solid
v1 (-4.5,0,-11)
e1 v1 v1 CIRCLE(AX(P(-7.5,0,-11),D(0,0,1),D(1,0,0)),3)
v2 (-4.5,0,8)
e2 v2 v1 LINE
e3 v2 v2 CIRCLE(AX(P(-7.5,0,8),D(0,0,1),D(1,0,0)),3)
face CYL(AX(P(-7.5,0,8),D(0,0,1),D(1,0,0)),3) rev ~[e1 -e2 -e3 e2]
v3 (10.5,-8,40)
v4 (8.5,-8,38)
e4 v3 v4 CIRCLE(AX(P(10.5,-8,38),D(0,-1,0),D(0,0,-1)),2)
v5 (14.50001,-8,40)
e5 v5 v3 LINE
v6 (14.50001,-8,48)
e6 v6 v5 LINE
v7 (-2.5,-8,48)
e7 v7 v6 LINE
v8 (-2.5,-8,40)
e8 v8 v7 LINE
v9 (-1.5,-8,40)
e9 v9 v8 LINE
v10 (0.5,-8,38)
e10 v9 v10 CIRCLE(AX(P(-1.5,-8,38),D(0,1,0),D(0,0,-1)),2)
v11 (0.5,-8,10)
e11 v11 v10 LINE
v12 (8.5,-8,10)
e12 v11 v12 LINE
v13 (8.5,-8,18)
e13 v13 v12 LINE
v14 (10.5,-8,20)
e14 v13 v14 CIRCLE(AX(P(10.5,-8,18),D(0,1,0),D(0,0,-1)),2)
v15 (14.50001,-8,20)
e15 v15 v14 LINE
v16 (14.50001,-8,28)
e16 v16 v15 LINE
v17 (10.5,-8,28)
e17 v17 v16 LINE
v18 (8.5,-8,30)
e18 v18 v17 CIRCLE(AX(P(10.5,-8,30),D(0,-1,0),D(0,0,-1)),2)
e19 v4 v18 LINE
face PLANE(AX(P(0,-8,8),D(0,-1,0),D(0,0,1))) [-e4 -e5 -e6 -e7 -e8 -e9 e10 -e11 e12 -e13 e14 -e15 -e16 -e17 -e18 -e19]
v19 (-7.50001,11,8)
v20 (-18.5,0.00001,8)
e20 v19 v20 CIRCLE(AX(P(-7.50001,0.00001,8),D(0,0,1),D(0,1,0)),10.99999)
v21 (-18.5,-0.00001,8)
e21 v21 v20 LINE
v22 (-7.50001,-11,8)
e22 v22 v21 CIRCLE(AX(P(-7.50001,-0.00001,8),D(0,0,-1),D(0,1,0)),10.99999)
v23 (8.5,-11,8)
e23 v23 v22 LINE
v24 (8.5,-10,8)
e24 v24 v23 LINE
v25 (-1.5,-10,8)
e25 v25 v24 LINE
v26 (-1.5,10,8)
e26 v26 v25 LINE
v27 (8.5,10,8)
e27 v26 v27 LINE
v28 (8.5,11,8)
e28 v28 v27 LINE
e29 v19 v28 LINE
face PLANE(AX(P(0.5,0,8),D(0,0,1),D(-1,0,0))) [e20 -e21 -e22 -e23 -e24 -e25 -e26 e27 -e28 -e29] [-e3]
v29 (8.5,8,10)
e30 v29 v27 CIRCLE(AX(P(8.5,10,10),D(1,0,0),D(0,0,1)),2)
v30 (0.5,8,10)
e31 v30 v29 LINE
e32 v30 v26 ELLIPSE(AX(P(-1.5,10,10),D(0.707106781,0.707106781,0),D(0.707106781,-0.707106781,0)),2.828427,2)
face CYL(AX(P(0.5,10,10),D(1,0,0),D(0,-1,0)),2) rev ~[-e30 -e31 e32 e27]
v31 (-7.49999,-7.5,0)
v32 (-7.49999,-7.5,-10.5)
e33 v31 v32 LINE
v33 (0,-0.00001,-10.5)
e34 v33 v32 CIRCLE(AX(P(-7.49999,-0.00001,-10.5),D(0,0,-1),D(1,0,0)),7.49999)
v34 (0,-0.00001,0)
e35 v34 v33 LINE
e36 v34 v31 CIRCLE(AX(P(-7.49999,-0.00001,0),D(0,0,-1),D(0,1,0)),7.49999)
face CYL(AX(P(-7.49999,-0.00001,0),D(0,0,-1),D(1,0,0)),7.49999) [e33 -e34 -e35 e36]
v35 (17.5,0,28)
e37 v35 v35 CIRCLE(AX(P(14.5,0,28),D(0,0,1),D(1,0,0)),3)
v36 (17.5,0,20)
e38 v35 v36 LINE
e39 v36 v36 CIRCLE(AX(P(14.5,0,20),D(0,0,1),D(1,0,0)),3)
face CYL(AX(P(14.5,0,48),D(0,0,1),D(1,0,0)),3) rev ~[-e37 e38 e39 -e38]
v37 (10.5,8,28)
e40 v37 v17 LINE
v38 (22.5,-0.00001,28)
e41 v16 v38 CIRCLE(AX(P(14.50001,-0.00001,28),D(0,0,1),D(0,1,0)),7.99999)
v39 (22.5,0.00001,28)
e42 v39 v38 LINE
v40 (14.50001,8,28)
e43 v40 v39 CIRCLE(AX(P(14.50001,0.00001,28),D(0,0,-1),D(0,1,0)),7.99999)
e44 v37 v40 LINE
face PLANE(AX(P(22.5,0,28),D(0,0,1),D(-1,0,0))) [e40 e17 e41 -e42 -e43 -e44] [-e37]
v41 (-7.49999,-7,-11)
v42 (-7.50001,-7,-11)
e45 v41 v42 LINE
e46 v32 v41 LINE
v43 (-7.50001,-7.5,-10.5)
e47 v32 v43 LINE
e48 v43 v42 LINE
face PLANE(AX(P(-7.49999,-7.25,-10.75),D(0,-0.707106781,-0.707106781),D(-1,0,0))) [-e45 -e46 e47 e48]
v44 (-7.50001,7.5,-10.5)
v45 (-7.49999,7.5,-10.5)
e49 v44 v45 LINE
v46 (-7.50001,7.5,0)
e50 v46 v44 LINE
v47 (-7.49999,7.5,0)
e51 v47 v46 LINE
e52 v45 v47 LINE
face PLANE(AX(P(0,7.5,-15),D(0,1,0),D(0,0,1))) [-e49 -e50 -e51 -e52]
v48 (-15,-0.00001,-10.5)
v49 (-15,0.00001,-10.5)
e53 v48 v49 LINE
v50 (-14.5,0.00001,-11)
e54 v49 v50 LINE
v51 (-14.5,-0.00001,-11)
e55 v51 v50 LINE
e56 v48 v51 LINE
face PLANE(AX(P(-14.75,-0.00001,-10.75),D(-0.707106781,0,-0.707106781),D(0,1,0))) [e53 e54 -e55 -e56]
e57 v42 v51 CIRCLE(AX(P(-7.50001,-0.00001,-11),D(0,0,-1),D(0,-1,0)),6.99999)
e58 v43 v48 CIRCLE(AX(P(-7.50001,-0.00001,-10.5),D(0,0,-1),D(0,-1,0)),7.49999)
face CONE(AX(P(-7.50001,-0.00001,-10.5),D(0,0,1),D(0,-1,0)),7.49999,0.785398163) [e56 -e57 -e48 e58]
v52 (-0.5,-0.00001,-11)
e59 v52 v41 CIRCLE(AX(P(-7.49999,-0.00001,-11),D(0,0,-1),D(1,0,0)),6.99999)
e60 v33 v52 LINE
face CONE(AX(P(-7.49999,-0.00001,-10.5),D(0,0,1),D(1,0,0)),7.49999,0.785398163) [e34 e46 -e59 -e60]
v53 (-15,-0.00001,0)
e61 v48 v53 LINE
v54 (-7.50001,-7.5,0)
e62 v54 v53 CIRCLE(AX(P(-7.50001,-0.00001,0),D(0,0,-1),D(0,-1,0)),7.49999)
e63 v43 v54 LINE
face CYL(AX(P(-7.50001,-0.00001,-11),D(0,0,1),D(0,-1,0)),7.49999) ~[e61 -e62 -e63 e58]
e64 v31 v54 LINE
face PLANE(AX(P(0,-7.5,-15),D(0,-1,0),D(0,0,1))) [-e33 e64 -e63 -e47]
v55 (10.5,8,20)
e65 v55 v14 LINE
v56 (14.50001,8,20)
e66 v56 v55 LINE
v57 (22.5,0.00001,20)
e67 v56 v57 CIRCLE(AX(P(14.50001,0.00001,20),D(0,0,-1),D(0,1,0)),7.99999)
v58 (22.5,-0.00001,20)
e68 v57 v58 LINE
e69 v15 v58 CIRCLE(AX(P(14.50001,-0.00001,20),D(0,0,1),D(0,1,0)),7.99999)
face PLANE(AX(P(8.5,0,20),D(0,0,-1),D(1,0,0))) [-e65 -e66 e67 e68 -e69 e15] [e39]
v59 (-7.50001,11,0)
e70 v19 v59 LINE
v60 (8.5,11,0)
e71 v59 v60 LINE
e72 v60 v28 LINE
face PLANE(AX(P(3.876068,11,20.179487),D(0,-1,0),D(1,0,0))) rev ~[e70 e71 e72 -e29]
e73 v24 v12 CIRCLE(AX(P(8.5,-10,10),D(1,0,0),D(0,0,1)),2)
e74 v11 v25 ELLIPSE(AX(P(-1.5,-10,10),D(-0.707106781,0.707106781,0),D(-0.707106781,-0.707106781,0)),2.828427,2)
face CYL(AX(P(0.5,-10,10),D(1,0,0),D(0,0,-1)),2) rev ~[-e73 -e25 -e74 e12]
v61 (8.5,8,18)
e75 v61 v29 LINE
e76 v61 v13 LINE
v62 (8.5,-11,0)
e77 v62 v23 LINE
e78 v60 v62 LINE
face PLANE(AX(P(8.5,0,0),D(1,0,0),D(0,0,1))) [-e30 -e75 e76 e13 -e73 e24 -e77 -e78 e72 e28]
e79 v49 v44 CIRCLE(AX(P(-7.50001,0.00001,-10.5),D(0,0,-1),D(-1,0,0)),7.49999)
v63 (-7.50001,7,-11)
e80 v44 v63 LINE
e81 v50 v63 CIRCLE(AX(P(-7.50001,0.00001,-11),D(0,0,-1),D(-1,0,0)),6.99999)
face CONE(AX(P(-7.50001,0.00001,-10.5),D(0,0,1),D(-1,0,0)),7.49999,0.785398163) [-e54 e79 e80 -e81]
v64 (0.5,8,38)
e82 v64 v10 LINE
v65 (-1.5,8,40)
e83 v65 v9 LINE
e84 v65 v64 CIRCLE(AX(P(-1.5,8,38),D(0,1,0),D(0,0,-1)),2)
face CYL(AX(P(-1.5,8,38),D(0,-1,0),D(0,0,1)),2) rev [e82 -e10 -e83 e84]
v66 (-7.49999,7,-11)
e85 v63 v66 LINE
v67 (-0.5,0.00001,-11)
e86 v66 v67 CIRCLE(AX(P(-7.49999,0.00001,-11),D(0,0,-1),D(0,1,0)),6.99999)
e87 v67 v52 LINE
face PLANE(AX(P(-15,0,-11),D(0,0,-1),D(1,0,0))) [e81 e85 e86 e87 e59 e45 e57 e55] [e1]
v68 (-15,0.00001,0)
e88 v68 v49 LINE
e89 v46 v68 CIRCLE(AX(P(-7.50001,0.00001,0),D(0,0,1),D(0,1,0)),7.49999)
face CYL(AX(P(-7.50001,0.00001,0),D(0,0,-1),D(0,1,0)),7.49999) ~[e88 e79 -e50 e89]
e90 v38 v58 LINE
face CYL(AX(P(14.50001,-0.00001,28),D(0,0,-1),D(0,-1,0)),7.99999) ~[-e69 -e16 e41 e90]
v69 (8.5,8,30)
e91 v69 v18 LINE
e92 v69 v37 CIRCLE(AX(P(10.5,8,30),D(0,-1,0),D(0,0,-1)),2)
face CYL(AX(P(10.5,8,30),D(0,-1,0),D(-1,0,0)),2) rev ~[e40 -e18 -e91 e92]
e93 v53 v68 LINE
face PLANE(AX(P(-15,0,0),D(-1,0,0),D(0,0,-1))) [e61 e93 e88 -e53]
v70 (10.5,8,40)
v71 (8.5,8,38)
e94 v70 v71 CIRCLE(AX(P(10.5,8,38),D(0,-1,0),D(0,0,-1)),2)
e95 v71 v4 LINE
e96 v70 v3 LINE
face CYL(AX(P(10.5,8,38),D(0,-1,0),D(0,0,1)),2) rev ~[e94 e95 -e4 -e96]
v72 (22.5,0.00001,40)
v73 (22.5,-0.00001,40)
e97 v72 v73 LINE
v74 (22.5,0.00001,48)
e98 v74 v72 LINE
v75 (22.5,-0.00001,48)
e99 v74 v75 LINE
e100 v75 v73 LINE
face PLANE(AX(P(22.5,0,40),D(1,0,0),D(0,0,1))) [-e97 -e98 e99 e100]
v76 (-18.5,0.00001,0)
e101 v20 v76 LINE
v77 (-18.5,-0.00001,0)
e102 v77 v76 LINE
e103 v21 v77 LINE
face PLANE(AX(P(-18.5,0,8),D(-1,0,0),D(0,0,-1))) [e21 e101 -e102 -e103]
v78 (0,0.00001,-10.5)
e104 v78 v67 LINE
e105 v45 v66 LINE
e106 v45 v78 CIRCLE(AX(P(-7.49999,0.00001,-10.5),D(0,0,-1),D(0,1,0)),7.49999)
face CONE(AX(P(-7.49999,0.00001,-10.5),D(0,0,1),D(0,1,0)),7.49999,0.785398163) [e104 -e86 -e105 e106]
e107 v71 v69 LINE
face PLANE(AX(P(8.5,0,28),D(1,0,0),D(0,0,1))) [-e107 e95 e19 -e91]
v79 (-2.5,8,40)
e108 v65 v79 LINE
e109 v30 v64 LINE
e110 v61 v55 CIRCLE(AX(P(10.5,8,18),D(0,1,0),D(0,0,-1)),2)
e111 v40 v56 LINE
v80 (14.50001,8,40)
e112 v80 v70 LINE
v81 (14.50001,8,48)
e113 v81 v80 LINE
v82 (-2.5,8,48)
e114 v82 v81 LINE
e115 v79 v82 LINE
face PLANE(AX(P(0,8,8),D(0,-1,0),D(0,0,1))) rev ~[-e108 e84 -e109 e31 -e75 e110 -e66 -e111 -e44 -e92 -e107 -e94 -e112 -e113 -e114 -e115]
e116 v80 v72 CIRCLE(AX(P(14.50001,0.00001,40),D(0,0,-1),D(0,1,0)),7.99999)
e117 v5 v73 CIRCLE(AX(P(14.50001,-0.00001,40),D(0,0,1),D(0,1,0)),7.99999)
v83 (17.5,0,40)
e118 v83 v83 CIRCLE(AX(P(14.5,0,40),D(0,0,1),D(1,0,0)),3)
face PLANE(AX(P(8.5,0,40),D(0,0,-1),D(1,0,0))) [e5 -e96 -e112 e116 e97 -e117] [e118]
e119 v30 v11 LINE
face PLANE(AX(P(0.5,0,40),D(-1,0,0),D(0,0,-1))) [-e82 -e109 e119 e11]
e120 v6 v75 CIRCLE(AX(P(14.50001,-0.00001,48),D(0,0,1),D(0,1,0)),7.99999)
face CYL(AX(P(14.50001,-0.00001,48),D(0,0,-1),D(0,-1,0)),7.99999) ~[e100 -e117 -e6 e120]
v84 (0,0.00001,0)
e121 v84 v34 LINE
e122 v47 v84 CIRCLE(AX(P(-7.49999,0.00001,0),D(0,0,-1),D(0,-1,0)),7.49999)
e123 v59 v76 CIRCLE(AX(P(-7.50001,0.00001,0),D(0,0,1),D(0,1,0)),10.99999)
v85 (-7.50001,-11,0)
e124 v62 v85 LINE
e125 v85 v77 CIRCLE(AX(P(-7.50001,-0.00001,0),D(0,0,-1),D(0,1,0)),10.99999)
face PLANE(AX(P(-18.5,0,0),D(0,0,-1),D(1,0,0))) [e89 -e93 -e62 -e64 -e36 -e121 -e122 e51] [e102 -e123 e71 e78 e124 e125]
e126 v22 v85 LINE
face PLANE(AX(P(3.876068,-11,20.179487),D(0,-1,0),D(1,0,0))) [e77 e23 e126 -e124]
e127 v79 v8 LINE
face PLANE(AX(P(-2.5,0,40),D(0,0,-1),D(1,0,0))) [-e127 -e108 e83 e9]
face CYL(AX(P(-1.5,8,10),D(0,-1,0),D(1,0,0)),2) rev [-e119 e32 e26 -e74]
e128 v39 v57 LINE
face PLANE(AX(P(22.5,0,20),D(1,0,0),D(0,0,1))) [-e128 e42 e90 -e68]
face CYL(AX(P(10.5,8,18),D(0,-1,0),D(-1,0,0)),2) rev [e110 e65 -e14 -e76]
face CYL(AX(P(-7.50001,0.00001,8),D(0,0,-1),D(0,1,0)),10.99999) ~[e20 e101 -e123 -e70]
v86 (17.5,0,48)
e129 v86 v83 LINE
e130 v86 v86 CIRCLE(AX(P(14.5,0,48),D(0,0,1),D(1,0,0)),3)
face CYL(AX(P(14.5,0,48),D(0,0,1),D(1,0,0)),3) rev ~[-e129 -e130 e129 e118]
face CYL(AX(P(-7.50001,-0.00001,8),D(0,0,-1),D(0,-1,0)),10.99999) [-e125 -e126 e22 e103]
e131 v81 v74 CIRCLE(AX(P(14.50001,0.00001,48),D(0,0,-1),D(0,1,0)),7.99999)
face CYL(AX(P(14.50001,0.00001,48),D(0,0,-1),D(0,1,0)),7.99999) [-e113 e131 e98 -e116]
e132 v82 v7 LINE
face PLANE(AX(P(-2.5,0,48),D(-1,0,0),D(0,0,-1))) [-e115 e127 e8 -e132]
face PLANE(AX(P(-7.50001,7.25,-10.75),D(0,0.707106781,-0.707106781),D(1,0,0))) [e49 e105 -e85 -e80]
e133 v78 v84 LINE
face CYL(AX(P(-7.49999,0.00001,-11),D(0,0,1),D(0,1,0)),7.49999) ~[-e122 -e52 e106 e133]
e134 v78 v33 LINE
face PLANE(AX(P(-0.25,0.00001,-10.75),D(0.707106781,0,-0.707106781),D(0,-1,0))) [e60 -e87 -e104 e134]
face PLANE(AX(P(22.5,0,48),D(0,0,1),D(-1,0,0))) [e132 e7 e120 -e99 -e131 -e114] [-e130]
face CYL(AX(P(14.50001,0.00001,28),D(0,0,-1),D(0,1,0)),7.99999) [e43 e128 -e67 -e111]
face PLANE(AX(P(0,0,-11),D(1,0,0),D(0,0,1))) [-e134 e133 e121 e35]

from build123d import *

# Parameters (mm, degrees)
F1_DEPTH  = 11
F2_W      = 8
F2_H      = 45
F2_W_2    = 8.5
F2_H_2    = 15
F3_DEPTH  = 25
F4_R      = 7.49999
F5_R      = 10.99999
F6_R      = 7.99999
F7_R      = 2
F8_R      = 3
F9_DEPTH  = 19
F10_R     = 3
F11_DEPTH = 35
F12_SIZE  = 0.5


# Not quite as in the source:
# - a fillet or chamfer is up to 0.001 mm smaller than in the source, because OpenCascade refuses the exact size


with BuildPart() as f1:
    # F0 (on Front) → F1 (new body, symmetric)
    with BuildSketch(Plane.XZ):
        Polygon((-15, -11), (0, -11), (0, 0), (8.5, 0), (8.5, 20), (22.5, 20), (22.5, 28), (8.5, 28), (8.5, 40), (22.5, 40), (22.5, 48), (-2.5, 48), (-2.5, 40), (0.5, 40), (0.5, 8), (-18.5, 8), (-18.5, 0), (-15, 0), align=None)
    extrude(amount=F1_DEPTH, both=True)

    # F2 (on Right) → F3 (cut, symmetric)
    with BuildSketch(Plane.YZ):
        with Locations((-12, 30.5)):
            Rectangle(F2_W, F2_H)
        with Locations((12, 30.5)):
            Rectangle(F2_W, F2_H)
        with Locations((-11.75, -7.5)):
            Rectangle(F2_W_2, F2_H_2)
        with Locations((11.75, -7.5)):
            Rectangle(F2_W_2, F2_H_2)
    extrude(amount=F3_DEPTH, both=True, mode=Mode.SUBTRACT)

    # F4 (radius 7.5 in the source; OpenCascade refuses exactly that, so slightly less here)
    f4_edges = [f1.edges().sort_by_distance(p)[0] for p in [
        (0, -7.5, -5.5),
        (-15, -7.5, -5.5),
        (0, 7.5, -5.5),
        (-15, 7.5, -5.5),
    ]]
    fillet(f4_edges, radius=F4_R)

    # F5 (radius 11 in the source; OpenCascade refuses exactly that, so slightly less here)
    f5_edges = [f1.edges().sort_by_distance(p)[0] for p in [
        (-18.5, 11, 4),
        (-18.5, -11, 4),
    ]]
    fillet(f5_edges, radius=F5_R)

    # F6 (radius 8 in the source; OpenCascade refuses exactly that, so slightly less here)
    f6_edges = [f1.edges().sort_by_distance(p)[0] for p in [
        (22.5, 8, 44),
        (22.5, 8, 24),
        (22.5, -8, 24),
        (22.5, -8, 44),
    ]]
    fillet(f6_edges, radius=F6_R)

    # F7
    f7_edges = [f1.edges().sort_by_distance(p)[0] for p in [
        (8.5, 0, 28),
        (8.5, 0, 40),
        (0.5, 0, 40),
        (0.5, 0, 8),
        (4.5, -8, 8),
        (4.5, 8, 8),
        (8.5, 0, 20),
    ]]
    fillet(f7_edges, radius=F7_R)

    # F8 (on face) → F9 (cut)
    with BuildSketch(Plane.XY.offset(8)):
        with Locations((-7.5, 0)):
            Circle(F8_R)
    extrude(amount=-F9_DEPTH, mode=Mode.SUBTRACT)

    # F10 (on face) → F11 (cut)
    with BuildSketch(Plane.XY.offset(48)):
        with Locations((14.5, 0)):
            Circle(F10_R)
    extrude(amount=-F11_DEPTH, mode=Mode.SUBTRACT)

    # F12
    f12_edges = [f1.edges().sort_by_distance(p)[0] for p in [
        (-12.803304, -5.303304, -11),
    ]]
    chamfer(f12_edges, length=F12_SIZE)


solid = f1.part
